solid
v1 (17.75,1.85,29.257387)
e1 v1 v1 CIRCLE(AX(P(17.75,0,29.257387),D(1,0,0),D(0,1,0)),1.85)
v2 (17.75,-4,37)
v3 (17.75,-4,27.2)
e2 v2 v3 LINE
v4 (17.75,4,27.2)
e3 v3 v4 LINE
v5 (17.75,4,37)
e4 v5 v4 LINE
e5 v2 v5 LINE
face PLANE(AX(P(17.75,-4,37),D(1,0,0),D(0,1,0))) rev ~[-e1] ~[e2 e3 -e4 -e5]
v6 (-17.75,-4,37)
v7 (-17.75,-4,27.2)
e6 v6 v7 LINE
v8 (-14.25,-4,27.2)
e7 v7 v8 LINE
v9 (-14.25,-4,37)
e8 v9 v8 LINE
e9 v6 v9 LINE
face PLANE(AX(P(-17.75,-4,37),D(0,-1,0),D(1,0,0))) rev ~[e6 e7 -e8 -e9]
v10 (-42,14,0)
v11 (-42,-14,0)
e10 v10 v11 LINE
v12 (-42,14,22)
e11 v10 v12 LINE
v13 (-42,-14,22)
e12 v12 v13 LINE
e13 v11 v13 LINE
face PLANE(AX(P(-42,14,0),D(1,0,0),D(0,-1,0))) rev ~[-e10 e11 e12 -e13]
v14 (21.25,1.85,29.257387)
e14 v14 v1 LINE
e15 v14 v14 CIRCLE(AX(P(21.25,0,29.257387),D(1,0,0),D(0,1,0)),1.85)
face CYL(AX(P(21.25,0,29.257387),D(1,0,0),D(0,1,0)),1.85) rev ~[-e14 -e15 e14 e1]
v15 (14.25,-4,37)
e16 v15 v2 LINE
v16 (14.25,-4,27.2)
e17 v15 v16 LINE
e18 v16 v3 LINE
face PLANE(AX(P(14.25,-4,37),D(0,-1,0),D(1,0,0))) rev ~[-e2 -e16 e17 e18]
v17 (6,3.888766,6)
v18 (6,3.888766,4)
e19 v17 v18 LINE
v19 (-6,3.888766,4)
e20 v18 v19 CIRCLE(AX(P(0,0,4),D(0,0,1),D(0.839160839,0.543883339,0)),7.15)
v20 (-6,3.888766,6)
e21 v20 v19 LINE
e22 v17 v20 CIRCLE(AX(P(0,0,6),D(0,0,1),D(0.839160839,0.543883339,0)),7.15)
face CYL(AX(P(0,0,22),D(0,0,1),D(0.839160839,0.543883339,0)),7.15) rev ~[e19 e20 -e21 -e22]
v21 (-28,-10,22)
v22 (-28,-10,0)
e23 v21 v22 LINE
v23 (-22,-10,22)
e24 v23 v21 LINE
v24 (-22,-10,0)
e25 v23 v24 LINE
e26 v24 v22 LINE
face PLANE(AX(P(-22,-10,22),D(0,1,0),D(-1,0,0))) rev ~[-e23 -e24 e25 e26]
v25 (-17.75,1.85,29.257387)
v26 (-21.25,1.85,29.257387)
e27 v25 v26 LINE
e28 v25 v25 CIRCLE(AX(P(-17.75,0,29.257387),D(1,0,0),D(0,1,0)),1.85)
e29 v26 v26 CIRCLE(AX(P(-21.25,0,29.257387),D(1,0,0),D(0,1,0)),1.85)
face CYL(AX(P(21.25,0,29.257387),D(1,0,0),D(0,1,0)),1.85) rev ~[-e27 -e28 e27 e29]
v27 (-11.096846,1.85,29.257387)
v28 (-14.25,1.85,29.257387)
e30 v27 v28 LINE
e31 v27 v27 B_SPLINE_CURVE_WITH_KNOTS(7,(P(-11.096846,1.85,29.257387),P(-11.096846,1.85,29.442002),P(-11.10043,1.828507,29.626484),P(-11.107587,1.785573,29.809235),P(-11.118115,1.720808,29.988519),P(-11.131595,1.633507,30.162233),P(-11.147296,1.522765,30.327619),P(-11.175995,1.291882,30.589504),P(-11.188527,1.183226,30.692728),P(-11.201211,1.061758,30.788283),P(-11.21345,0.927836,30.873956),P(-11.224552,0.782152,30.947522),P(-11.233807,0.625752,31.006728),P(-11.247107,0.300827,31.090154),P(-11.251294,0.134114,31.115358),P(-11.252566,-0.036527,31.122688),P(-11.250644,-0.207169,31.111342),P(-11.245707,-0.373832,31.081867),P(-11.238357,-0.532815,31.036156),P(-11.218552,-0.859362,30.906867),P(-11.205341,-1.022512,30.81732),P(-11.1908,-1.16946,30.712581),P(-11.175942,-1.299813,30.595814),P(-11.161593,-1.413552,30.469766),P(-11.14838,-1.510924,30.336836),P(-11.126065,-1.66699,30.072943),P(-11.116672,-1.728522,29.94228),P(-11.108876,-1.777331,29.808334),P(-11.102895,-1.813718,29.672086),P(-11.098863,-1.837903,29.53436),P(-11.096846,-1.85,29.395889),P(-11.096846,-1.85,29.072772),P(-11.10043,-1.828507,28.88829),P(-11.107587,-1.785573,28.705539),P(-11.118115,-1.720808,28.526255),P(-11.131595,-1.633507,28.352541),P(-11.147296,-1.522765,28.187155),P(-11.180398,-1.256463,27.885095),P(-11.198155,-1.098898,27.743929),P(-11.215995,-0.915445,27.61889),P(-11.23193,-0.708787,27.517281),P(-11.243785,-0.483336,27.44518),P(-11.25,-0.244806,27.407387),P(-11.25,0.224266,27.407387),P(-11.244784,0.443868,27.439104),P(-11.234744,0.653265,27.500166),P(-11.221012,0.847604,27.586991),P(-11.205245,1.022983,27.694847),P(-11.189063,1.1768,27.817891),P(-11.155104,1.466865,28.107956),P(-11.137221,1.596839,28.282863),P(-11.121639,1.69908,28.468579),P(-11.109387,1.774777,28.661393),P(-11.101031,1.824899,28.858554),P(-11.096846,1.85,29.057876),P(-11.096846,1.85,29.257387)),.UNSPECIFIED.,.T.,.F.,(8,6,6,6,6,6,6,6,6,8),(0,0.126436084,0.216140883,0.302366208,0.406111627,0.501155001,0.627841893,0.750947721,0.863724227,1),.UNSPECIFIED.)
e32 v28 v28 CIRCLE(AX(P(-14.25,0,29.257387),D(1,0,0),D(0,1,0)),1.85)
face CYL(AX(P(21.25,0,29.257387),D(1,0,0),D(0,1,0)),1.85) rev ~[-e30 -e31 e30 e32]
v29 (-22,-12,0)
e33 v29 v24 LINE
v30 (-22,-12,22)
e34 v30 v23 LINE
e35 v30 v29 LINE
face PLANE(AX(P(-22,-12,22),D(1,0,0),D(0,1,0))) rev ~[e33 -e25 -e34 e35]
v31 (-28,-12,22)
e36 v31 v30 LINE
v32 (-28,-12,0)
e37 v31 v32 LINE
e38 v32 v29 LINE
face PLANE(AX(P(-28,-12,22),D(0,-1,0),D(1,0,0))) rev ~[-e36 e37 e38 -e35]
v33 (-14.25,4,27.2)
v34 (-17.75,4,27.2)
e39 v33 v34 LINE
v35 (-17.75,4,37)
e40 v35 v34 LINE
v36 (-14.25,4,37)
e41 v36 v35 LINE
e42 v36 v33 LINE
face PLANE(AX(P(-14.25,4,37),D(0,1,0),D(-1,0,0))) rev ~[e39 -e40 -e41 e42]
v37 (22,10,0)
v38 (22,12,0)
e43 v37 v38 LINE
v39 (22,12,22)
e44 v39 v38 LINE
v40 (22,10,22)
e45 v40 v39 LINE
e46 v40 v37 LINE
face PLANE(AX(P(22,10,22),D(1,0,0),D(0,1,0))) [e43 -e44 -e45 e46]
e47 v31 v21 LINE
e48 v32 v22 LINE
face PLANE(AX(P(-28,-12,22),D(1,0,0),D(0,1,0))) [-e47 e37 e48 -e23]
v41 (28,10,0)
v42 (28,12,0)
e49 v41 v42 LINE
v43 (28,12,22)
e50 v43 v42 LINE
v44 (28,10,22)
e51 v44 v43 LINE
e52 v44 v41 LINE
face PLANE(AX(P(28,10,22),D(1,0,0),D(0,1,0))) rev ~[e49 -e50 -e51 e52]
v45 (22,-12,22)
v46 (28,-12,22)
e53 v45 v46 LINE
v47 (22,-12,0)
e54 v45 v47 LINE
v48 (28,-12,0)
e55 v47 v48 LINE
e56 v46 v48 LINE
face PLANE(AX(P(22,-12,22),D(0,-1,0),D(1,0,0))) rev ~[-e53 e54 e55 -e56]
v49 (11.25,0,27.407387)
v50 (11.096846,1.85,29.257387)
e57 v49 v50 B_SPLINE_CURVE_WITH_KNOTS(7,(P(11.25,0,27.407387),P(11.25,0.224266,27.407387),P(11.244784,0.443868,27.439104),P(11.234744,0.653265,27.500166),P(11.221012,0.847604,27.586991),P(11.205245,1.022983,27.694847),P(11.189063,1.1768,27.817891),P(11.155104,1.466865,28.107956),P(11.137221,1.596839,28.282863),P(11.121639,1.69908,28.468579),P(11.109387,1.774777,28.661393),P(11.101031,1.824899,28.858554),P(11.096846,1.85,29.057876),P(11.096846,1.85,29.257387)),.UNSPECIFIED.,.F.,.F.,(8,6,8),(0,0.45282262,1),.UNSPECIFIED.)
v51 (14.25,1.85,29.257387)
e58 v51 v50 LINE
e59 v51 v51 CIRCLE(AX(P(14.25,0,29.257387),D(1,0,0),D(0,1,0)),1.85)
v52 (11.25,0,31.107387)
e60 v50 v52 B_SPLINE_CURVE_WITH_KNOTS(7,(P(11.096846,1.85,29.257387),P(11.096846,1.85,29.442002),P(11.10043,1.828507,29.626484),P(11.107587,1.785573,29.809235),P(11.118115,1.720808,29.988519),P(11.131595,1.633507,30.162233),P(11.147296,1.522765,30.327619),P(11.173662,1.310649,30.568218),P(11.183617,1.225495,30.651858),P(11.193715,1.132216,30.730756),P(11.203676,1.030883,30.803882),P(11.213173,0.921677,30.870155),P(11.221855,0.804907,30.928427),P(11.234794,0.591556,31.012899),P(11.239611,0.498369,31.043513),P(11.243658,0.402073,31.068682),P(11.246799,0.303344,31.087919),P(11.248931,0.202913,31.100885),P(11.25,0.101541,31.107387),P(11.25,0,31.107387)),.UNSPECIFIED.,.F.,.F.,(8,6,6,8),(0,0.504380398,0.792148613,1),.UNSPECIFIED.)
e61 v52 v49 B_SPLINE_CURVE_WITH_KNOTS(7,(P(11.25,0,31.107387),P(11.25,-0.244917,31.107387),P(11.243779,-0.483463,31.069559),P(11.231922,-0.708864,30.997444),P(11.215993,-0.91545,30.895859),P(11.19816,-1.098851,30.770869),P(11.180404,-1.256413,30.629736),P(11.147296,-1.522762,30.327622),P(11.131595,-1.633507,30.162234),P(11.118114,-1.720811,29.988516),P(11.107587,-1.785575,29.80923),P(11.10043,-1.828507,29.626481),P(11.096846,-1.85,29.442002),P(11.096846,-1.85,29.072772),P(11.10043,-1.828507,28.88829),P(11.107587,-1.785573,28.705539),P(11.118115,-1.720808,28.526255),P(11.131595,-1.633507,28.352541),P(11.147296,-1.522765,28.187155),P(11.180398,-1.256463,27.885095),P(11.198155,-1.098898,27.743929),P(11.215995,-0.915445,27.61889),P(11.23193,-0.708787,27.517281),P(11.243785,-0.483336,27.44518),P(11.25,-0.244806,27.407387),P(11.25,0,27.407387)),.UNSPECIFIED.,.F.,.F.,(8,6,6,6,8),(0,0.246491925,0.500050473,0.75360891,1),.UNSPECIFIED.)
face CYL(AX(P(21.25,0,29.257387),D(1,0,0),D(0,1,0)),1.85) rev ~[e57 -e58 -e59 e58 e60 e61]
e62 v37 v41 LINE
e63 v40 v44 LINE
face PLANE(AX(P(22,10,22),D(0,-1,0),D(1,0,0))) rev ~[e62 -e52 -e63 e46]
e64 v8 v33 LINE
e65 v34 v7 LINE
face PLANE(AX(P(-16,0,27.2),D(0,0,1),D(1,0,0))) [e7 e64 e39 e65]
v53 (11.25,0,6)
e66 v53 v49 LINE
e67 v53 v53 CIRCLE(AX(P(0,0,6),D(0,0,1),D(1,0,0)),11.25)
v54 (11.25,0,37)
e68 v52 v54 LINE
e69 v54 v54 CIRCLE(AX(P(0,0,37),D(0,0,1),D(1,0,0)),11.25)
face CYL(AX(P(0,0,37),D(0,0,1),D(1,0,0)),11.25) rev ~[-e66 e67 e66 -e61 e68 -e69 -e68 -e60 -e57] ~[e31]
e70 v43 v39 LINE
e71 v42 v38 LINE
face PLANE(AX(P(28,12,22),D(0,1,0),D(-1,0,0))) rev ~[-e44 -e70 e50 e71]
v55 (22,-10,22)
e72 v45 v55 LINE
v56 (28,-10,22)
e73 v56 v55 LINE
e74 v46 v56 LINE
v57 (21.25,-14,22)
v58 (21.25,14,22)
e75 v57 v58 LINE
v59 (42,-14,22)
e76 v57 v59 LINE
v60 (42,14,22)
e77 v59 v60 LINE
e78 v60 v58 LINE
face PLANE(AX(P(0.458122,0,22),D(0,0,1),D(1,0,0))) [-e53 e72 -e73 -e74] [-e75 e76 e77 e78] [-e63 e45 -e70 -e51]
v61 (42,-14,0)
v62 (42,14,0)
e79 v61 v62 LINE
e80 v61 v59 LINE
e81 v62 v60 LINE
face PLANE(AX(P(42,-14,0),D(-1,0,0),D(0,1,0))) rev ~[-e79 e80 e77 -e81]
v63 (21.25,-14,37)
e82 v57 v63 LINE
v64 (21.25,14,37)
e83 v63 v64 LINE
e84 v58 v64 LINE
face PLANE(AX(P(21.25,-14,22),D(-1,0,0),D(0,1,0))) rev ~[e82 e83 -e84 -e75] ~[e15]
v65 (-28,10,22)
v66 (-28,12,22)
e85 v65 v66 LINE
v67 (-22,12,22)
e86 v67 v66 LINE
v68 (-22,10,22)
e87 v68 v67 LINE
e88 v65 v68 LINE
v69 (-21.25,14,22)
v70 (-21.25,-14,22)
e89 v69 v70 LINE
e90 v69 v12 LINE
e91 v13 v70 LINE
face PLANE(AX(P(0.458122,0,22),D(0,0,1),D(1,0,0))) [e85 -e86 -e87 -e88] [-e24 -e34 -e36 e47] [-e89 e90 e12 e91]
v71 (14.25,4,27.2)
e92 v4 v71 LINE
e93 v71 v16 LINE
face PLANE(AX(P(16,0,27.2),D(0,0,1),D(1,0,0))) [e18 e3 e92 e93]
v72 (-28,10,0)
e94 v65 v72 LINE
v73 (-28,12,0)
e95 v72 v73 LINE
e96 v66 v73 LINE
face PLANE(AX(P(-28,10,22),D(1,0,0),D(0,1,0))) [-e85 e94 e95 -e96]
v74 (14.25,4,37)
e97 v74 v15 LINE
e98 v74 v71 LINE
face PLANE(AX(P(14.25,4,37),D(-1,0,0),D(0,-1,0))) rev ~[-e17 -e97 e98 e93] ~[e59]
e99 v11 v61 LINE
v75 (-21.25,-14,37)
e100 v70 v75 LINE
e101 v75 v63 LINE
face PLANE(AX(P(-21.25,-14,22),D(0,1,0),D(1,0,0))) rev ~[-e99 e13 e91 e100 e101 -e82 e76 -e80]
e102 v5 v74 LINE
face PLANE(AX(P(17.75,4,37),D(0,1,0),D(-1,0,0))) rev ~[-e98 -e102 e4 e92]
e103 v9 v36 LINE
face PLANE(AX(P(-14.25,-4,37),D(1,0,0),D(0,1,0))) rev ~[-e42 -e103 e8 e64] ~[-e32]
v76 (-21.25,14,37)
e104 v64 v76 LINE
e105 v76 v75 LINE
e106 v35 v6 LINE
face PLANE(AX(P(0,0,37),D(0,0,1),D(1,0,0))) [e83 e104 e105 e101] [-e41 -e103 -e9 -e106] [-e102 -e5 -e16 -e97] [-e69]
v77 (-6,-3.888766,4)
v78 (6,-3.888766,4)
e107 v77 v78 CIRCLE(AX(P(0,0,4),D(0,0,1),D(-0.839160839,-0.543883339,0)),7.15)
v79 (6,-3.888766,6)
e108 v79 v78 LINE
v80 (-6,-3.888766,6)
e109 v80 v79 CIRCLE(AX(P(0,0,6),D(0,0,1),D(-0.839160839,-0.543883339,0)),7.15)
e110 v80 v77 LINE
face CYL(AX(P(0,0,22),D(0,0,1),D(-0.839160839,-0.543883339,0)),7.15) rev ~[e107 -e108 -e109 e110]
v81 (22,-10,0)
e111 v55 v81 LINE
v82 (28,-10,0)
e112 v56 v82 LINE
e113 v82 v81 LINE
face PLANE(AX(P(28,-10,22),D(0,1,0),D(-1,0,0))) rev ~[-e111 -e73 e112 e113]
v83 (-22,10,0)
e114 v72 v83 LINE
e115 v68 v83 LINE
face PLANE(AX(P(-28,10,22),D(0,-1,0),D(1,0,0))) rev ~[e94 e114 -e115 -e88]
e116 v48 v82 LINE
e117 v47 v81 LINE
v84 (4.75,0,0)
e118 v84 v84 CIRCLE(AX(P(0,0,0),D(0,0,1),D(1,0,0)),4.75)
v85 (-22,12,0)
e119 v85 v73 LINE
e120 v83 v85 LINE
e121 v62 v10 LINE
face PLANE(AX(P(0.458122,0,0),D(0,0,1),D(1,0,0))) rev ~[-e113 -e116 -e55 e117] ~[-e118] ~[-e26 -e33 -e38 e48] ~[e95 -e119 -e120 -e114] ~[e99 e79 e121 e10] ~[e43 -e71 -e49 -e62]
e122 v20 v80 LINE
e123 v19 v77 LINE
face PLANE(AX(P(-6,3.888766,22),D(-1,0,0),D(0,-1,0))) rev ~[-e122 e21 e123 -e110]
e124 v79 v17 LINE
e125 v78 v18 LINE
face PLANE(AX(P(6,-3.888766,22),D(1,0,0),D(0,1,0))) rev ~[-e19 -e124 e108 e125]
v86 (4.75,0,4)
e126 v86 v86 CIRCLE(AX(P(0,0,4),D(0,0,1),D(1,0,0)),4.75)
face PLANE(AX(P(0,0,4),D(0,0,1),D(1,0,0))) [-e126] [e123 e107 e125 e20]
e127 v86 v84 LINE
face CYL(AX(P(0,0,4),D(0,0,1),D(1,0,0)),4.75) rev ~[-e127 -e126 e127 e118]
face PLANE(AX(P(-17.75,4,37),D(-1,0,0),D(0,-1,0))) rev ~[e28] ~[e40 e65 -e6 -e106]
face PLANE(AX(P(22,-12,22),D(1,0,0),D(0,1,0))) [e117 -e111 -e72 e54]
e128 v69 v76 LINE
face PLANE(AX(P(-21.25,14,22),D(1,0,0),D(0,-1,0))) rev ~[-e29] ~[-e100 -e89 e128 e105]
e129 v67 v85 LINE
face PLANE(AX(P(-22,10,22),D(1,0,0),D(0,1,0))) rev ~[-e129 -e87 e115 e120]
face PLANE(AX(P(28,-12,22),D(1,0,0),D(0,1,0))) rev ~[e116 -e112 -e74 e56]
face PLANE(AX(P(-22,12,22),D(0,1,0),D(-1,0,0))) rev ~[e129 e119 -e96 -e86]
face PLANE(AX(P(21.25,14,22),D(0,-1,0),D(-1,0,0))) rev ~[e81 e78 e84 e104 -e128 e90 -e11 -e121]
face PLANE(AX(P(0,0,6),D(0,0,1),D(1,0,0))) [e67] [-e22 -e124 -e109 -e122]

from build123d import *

# Parameters (mm, degrees)
F1_DEPTH  = 22
F3_R      = 11.25
F4_DEPTH  = 16
F5_DEPTH  = 18
F6_R      = 4.75
F7_DEPTH  = 4
F8_W      = 3
F8_H      = 2
F9_DEPTH  = 22
F11_DEPTH = 15
F12_R     = 11.25
F13_DEPTH = 15
F14_R     = 1.85
F15_DEPTH = 50.8
F17_DEPTH = 9.8


# Not quite as in the source:
# - a feature names something its author has since deleted; it is built from what else it names


with BuildPart() as f1:
    # F0 (on Top) → F1 (new body)
    with BuildSketch(Plane.XY):
        with BuildLine():
            ThreePointArc((1.21e-08, -14), (9.8994949409, -9.8994949323), (14, 0))
            ThreePointArc((14, 0), (9.8994949202, 9.899494953), (-4.65e-08, 14))
            ThreePointArc((-4.65e-08, 14), (-14, -2.93e-08), (1.21e-08, -14))
        make_face()
        with BuildLine():
            ThreePointArc((-4.65e-08, 14), (9.8994949202, 9.899494953), (14, 0))
            ThreePointArc((14, 0), (9.8994949409, -9.8994949323), (1.21e-08, -14))
            Line((1.21e-08, -14), (42, -14))
            Line((42, -14), (42, 14))
            Line((42, 14), (-4.65e-08, 14))
        make_face()
        with BuildLine():
            ThreePointArc((1.21e-08, -14), (-14, -2.93e-08), (-4.65e-08, 14))
            Line((-4.65e-08, 14), (-42, 14))
            Line((-42, 14), (-42, -14))
            Line((-42, -14), (1.21e-08, -14))
        make_face()
    extrude(amount=F1_DEPTH)

    # F3 (on face) → F4 (cut)
    with BuildSketch(Plane.XY.offset(22)):
        Circle(F3_R)
    extrude(amount=-F4_DEPTH, mode=Mode.SUBTRACT)

    # F2 (on face) → F5 (cut)
    with BuildSketch(Plane.XY.offset(22)):
        with BuildLine():
            Line((-6, 3.8887658711), (-6, -3.8887658711))
            ThreePointArc((-6, -3.8887658711), (0, -7.15), (6, -3.8887658711))
            Line((6, -3.8887658711), (6, 3.8887658711))
            ThreePointArc((6, 3.8887658711), (0, 7.15), (-6, 3.8887658711))
        make_face()
    extrude(amount=-F5_DEPTH, mode=Mode.SUBTRACT)

    # F6 (on face) → F7 (cut)
    with BuildSketch(Plane.XY.offset(4)):
        Circle(F6_R)
    extrude(amount=-F7_DEPTH, mode=Mode.SUBTRACT)

    # F8 (on face) → F9 (cut)
    with BuildSketch(Plane.XY.offset(22)):
        with Locations((-26.5, 11)):
            Rectangle(F8_W, F8_H)
        with Locations((-23.5, 11)):
            Rectangle(F8_W, F8_H)
        with Locations((-23.5, -11)):
            Rectangle(F8_W, F8_H)
        with Locations((-26.5, -11)):
            Rectangle(F8_W, F8_H)
        with Locations((23.5, 11)):
            Rectangle(F8_W, F8_H)
        with Locations((26.5, 11)):
            Rectangle(F8_W, F8_H)
        with Locations((26.5, -11)):
            Rectangle(F8_W, F8_H)
        with Locations((23.5, -11)):
            Rectangle(F8_W, F8_H)
    extrude(amount=-F9_DEPTH, mode=Mode.SUBTRACT)

    # F10 (on face) → F11 (join)
    with BuildSketch(Plane.XY.offset(22)):
        Polygon((-21.25, -14), (21.25, -14), (21.25, 0), (21.25, 14), (-21.25, 14), align=None)
    extrude(amount=F11_DEPTH)

    # F12 (on face) → F13 (cut)
    with BuildSketch(Plane.XY.offset(37)):
        Circle(F12_R)
    extrude(amount=-F13_DEPTH, mode=Mode.SUBTRACT)

    # F14 (on face) → F15 (cut)
    with BuildSketch(Plane.YZ.offset(21.25)):
        with Locations((0, 29.2573869228)):
            Circle(F14_R)
    extrude(amount=-F15_DEPTH, mode=Mode.SUBTRACT)

    # F16 (on face) → F17 (cut)
    with BuildSketch(Plane.XY.offset(37)):
        Polygon((-14.25, -4), (-14.25, 4), (-17.75, 4), (-17.75, 1.1981789721), (-17.75, -4), align=None)
        Polygon((14.25, -4), (17.75, -4), (17.75, 0), (17.75, 4), (14.25, 4), align=None)
    extrude(amount=-F17_DEPTH, mode=Mode.SUBTRACT)


solid = f1.part
